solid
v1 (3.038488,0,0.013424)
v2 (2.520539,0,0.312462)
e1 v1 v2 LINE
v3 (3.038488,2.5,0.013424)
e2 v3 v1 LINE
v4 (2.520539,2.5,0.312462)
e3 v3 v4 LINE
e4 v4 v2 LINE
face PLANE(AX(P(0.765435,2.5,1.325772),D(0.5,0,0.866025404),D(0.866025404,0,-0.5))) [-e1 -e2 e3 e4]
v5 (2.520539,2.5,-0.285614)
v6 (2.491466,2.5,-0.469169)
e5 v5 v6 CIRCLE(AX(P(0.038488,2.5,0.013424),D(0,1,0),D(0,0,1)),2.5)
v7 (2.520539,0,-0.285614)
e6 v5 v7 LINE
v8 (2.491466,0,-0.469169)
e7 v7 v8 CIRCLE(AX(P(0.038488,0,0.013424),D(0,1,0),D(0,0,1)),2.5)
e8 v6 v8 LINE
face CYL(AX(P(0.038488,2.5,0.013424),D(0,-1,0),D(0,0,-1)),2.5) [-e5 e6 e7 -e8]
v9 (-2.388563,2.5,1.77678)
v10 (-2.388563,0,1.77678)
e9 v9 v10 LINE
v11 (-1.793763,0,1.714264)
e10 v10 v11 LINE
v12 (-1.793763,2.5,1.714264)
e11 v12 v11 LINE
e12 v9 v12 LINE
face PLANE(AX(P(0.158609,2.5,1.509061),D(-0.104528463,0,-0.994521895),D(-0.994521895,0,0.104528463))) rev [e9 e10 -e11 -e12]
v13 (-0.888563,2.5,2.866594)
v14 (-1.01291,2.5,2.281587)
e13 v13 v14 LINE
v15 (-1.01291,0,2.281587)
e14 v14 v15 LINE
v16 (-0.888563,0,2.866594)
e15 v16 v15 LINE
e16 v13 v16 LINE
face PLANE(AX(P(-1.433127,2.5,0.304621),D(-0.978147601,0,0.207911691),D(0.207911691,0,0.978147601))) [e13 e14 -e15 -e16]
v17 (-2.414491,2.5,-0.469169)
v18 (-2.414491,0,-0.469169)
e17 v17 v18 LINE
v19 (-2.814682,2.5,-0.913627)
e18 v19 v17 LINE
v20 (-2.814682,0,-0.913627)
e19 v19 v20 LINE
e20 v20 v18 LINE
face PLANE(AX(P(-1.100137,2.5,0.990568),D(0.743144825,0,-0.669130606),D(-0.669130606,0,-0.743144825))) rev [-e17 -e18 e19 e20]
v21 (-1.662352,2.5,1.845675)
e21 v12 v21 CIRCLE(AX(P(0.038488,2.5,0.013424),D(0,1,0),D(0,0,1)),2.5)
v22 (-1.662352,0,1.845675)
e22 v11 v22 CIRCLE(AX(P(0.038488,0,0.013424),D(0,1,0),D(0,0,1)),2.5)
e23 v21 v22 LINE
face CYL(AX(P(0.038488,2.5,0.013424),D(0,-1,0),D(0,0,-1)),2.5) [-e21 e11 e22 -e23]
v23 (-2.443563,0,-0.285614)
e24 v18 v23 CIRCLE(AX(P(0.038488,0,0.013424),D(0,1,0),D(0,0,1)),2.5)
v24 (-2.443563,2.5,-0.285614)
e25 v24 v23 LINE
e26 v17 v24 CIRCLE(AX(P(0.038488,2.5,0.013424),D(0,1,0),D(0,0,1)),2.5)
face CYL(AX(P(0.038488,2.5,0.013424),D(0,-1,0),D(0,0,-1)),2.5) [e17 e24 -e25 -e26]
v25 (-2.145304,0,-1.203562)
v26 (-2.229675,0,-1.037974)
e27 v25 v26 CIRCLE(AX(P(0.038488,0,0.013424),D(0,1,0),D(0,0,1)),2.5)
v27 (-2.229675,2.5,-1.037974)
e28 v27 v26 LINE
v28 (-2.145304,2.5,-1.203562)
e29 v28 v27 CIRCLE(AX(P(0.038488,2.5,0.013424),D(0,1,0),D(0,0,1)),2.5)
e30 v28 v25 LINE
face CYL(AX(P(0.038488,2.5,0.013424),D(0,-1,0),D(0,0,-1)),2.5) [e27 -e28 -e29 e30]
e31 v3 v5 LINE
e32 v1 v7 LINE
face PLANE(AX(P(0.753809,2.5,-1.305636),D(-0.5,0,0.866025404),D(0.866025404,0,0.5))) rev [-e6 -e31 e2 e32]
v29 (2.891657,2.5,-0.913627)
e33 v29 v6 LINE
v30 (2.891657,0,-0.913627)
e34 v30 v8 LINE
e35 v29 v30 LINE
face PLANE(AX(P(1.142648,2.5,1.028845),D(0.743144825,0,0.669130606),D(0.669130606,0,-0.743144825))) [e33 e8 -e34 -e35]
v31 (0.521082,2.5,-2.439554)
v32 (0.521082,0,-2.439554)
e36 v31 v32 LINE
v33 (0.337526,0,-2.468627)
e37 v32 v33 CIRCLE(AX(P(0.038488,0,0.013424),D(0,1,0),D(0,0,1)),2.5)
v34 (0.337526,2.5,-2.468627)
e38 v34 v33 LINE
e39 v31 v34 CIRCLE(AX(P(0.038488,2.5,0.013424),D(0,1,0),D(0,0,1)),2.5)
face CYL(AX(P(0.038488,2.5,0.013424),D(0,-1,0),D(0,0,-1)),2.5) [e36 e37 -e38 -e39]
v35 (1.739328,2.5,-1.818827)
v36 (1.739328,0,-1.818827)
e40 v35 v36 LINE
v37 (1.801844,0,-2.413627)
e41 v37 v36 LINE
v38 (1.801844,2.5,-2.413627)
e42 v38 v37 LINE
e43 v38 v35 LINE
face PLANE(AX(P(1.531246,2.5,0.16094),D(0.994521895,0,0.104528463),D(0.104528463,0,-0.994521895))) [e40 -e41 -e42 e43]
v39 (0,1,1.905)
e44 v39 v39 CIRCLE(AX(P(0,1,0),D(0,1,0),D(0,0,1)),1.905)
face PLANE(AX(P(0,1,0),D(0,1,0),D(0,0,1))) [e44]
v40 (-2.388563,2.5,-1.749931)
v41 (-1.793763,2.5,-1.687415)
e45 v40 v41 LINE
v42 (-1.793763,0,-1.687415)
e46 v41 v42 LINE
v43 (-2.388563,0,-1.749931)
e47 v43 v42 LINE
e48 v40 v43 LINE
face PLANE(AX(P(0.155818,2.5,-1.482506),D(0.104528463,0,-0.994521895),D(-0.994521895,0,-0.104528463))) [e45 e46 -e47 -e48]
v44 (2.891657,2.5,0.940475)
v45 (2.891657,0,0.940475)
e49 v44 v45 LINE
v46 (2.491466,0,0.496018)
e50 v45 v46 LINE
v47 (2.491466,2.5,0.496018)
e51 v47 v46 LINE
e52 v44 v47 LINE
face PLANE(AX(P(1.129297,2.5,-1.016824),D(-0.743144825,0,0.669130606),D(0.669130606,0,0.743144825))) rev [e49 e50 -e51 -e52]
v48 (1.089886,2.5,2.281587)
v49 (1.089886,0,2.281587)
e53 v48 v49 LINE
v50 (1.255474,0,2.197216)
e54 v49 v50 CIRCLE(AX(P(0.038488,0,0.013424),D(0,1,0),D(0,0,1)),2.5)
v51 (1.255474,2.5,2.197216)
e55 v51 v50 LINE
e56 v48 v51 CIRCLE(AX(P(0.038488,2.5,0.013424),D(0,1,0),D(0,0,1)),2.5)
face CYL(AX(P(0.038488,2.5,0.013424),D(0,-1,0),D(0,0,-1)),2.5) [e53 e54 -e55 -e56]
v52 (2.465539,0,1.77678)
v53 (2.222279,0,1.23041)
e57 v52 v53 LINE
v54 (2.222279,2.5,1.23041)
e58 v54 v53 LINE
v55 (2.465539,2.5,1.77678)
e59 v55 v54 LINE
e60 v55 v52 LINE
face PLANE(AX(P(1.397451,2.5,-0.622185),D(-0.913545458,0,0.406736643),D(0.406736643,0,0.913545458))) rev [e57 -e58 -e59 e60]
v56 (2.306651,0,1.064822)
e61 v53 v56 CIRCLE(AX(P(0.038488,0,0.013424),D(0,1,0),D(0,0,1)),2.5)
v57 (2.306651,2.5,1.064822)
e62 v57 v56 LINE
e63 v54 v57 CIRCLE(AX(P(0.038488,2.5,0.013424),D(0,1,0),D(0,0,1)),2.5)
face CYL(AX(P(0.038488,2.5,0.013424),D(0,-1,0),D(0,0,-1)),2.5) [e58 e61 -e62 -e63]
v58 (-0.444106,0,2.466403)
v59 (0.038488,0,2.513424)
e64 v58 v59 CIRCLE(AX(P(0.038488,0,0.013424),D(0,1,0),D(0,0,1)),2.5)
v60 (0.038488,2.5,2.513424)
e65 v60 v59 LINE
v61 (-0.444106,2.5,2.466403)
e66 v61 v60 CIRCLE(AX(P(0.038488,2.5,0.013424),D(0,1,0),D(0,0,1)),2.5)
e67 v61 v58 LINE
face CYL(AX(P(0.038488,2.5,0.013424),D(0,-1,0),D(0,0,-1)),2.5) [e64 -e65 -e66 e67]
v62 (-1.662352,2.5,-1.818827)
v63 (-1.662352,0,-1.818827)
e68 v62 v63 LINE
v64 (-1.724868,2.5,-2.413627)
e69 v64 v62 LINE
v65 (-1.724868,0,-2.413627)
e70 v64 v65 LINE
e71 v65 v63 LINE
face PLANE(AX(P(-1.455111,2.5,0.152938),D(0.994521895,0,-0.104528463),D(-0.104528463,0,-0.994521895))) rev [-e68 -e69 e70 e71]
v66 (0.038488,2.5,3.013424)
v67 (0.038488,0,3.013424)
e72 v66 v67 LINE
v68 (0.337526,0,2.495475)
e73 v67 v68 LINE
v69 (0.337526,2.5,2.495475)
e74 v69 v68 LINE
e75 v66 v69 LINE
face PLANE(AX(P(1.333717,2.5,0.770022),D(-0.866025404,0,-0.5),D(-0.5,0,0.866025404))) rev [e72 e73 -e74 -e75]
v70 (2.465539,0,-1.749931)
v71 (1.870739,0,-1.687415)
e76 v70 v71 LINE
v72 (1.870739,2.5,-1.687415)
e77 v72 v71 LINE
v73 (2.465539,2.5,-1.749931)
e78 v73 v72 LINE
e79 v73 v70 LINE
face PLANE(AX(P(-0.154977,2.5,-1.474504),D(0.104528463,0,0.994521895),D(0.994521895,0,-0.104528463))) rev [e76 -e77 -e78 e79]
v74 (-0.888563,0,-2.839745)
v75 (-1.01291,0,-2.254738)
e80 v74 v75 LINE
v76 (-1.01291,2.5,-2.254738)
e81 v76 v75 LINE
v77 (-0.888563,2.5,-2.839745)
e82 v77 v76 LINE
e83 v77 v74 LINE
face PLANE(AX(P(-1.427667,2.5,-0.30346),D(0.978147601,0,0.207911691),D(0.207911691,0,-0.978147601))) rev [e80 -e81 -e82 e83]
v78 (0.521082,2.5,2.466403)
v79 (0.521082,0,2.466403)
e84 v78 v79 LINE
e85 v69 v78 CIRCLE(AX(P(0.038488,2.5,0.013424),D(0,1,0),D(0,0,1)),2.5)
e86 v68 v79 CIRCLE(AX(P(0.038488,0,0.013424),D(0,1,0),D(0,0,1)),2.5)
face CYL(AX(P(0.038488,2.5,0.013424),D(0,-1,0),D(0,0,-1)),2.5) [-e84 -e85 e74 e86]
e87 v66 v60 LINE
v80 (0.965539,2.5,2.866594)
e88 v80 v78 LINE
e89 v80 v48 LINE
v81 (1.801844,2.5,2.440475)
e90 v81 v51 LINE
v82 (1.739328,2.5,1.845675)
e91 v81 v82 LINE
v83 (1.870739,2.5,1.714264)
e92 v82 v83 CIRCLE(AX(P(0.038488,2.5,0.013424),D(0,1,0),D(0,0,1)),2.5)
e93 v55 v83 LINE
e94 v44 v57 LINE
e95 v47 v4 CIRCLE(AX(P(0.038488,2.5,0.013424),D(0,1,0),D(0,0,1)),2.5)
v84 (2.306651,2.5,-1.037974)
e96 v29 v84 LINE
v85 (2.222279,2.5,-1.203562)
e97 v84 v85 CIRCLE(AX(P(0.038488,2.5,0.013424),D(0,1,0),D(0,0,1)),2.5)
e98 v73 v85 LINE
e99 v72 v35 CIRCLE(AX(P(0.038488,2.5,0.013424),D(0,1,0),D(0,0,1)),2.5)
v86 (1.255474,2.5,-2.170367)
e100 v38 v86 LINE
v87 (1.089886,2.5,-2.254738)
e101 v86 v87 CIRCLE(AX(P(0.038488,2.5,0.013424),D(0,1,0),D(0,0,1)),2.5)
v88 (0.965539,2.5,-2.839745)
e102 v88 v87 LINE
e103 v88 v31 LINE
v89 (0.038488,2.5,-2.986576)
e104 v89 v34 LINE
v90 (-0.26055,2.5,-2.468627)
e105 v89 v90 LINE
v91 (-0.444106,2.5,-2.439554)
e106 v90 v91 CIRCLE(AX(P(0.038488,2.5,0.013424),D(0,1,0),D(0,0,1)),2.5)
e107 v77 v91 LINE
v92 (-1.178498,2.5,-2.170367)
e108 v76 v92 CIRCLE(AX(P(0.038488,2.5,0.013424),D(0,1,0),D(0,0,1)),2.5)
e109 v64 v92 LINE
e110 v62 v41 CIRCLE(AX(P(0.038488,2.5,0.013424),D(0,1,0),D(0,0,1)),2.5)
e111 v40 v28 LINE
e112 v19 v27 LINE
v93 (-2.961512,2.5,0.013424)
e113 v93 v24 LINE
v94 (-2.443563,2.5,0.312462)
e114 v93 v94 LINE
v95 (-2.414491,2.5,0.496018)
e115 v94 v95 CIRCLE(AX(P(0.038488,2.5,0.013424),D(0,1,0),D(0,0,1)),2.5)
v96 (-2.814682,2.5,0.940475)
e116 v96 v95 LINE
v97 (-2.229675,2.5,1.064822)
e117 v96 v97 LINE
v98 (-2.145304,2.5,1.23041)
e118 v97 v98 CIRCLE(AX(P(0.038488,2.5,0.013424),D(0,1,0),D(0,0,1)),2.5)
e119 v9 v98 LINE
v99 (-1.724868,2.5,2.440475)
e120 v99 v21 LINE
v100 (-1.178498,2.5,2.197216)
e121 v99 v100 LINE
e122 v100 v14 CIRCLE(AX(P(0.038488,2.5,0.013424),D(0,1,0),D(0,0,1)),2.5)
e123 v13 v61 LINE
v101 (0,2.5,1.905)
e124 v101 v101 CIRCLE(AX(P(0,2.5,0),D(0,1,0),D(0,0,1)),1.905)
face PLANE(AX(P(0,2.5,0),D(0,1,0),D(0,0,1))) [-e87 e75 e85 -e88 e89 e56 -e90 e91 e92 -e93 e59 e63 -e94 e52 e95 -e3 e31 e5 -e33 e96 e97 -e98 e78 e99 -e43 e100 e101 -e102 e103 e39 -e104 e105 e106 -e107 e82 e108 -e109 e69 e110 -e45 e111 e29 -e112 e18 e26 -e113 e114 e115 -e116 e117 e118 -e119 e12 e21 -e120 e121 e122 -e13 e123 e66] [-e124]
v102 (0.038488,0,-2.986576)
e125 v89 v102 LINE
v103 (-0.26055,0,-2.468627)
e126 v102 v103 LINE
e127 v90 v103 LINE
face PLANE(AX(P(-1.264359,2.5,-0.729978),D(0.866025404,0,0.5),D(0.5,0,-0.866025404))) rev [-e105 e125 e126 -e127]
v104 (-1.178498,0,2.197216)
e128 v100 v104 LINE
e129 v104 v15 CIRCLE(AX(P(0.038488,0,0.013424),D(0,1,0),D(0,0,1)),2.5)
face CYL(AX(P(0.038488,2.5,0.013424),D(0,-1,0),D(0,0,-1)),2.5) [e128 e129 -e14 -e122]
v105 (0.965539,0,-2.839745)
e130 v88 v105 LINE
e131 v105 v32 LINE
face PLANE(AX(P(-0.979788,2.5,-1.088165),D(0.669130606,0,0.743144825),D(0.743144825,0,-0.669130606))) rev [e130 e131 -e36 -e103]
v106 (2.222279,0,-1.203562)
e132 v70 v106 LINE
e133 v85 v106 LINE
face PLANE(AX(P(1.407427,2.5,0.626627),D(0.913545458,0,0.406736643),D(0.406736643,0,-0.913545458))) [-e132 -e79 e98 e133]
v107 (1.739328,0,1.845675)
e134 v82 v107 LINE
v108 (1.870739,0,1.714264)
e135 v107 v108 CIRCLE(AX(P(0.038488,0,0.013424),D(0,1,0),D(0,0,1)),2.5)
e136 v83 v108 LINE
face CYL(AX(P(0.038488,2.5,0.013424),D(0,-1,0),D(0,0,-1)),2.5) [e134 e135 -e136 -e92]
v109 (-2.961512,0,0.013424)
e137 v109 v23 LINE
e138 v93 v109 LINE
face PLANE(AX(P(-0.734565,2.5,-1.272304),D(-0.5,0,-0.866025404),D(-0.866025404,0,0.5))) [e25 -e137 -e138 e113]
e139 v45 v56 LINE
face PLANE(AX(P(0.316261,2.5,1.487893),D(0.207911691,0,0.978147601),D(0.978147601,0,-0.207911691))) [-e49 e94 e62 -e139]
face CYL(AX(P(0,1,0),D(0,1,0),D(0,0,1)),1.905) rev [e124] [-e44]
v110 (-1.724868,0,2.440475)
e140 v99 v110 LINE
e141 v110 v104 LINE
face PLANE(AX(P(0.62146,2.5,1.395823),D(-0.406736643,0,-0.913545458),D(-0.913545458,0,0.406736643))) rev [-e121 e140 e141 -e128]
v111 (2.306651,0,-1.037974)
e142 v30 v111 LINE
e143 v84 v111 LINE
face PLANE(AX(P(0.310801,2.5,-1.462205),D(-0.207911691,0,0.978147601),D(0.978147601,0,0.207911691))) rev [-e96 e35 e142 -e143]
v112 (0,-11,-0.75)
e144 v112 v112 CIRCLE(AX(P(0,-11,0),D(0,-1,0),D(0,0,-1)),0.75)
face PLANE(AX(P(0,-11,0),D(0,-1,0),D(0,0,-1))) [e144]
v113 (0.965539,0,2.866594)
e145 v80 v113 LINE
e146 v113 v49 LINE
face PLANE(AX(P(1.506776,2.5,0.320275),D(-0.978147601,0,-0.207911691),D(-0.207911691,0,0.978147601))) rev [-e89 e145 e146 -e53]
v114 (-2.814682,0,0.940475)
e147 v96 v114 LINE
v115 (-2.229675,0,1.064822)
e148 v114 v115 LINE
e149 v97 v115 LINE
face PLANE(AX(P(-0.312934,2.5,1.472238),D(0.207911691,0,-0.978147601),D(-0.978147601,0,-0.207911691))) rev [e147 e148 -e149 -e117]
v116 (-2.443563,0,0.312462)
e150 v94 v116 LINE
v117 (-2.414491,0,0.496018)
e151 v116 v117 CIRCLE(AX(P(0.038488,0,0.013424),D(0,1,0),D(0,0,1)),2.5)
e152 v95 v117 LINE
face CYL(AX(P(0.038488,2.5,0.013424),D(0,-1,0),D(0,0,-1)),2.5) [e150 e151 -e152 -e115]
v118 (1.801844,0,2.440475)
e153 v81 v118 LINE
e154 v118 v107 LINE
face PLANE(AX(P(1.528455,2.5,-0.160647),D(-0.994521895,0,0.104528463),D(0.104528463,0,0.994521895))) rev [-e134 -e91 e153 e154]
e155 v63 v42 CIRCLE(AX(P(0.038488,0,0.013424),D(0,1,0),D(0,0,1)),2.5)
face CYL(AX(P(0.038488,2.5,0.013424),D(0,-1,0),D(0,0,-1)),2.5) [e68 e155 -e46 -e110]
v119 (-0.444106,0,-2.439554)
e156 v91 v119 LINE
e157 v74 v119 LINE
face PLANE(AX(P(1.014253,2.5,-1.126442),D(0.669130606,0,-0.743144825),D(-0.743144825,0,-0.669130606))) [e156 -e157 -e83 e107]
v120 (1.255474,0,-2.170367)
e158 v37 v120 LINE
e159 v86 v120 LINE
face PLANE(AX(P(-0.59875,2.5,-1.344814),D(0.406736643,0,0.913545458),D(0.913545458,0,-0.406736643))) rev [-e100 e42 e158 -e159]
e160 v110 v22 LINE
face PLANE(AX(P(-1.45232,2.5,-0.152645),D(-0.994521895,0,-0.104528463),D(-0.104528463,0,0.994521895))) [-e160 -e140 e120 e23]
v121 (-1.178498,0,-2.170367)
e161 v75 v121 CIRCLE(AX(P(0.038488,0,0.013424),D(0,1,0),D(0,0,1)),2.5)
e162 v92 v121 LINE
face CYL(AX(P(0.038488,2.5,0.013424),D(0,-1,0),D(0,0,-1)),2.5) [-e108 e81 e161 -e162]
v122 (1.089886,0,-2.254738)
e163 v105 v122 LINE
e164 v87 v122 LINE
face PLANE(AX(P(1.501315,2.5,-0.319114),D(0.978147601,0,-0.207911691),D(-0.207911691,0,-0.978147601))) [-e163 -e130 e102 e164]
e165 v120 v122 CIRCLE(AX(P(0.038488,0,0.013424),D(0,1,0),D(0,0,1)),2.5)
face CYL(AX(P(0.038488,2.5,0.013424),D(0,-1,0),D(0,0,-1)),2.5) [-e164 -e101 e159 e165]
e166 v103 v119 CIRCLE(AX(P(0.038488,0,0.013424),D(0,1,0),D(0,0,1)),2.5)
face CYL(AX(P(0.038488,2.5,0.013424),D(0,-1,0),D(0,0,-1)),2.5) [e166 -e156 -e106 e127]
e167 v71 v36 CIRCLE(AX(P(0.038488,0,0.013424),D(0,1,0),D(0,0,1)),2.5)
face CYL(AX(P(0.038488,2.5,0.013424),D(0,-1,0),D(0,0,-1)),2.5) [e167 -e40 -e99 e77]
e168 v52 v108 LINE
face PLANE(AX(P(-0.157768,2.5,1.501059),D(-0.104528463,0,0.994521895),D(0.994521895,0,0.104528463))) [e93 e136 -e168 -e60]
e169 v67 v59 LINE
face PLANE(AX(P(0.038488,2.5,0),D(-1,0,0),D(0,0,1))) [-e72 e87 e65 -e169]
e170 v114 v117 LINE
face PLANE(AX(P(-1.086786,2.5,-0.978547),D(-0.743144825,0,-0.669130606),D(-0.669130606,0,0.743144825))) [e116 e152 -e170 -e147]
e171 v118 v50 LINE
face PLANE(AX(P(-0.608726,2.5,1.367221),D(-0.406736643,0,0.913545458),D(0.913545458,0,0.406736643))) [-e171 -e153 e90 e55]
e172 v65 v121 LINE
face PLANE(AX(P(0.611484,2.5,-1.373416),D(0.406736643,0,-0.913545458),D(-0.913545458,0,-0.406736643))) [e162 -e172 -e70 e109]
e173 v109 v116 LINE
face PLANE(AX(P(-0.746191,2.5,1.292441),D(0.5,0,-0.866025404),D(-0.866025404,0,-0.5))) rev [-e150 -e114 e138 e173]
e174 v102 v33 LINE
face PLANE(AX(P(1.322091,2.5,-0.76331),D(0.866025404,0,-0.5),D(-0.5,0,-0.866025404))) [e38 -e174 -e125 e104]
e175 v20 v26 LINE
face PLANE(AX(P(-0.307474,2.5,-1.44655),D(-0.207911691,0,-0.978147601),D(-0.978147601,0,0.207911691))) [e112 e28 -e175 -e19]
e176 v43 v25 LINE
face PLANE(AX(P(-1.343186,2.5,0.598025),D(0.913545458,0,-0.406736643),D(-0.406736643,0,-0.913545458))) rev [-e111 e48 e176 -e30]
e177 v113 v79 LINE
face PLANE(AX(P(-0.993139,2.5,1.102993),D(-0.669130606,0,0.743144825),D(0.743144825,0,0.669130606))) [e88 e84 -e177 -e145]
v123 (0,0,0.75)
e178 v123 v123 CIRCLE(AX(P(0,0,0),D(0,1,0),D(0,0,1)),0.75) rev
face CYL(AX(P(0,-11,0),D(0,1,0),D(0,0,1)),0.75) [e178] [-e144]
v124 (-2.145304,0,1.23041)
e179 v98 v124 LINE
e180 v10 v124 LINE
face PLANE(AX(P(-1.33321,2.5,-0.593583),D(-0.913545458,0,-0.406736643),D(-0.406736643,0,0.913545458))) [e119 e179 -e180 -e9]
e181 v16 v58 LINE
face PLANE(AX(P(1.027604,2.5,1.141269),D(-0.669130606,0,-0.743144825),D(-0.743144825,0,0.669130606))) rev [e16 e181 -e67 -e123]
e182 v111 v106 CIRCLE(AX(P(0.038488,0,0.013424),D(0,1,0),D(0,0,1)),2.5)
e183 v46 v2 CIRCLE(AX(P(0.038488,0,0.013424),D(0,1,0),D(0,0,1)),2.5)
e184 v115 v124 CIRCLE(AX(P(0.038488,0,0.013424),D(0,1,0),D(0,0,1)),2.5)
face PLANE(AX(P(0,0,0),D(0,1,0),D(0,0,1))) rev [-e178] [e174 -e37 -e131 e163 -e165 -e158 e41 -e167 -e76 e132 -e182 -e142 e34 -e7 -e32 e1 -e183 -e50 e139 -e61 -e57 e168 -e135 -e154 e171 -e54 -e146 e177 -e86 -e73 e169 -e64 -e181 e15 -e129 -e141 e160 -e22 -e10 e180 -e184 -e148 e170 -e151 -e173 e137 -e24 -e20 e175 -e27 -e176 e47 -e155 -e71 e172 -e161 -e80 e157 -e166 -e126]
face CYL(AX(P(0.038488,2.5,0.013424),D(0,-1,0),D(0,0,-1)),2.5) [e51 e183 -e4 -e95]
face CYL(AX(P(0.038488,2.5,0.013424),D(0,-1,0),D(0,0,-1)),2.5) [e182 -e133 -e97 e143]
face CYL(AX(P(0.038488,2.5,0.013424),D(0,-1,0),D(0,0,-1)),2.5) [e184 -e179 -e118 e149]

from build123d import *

# Parameters (mm, degrees)
BOSS_EXTRUDE2_DEPTH = 2.5
SKETCH5_R           = 1.905
CUT_EXTRUDE1_DEPTH  = 1.5
SKETCH6_R           = 0.75
BOSS_EXTRUDE3_DEPTH = 11


# Read off the part's stored shape, not the designer's step: Boss-Extrude2
with BuildPart() as part:
    # Boss-Extrude2 outline → Boss-Extrude2 (new body)
    with BuildSketch(Plane(origin=(0, 0, 0), x_dir=(1, 0, 0), z_dir=(0, 1, 0))):
        with BuildLine():
            ThreePointArc((-0.444105945, -2.466402753), (-0.203951755, -2.501641146), (0.038487797, -2.513424302))
            Line((0.038487797, -2.513424302), (0.038487797, -3.013424302))
            Line((0.038487797, -3.013424302), (0.337525902, -2.495475109))
            ThreePointArc((0.337525902, -2.495475109), (0.429573959, -2.482645153), (0.521081538, -2.466402753))
            Line((0.521081538, -2.466402753), (0.96553878, -2.866593851))
            Line((0.96553878, -2.866593851), (1.089885816, -2.28158704))
            ThreePointArc((1.089885816, -2.28158704), (1.173464046, -2.240940612), (1.255473747, -2.197215774))
            Line((1.255473747, -2.197215774), (1.801843553, -2.440475285))
            Line((1.801843553, -2.440475285), (1.739327566, -1.845675398))
            ThreePointArc((1.739327566, -1.845675398), (1.80625475, -1.781191255), (1.870738892, -1.714264071))
            Line((1.870738892, -1.714264071), (2.46553878, -1.776780059))
            Line((2.46553878, -1.776780059), (2.222279269, -1.230410253))
            ThreePointArc((2.222279269, -1.230410253), (2.266004107, -1.148400551), (2.306650534, -1.064822321))
            Line((2.306650534, -1.064822321), (2.891657345, -0.940475285))
            Line((2.891657345, -0.940475285), (2.491466248, -0.496018043))
            ThreePointArc((2.491466248, -0.496018043), (2.507708648, -0.404510464), (2.520538604, -0.312462408))
            Line((2.520538604, -0.312462408), (3.038487797, -0.013424302))
            Line((3.038487797, -0.013424302), (2.520538604, 0.285613804))
            ThreePointArc((2.520538604, 0.285613804), (2.507708648, 0.377661861), (2.491466248, 0.46916944))
            Line((2.491466248, 0.46916944), (2.891657345, 0.913626681))
            Line((2.891657345, 0.913626681), (2.306650534, 1.037973718))
            ThreePointArc((2.306650534, 1.037973718), (2.266004107, 1.121551948), (2.222279269, 1.203561649))
            Line((2.222279269, 1.203561649), (2.46553878, 1.749931455))
            Line((2.46553878, 1.749931455), (1.870738892, 1.687415468))
            ThreePointArc((1.870738892, 1.687415468), (1.80625475, 1.754342652), (1.739327566, 1.818826794))
            Line((1.739327566, 1.818826794), (1.801843553, 2.413626681))
            Line((1.801843553, 2.413626681), (1.255473747, 2.170367171))
            ThreePointArc((1.255473747, 2.170367171), (1.173464046, 2.214092009), (1.089885816, 2.254738436))
            Line((1.089885816, 2.254738436), (0.96553878, 2.839745247))
            Line((0.96553878, 2.839745247), (0.521081538, 2.439554149))
            ThreePointArc((0.521081538, 2.439554149), (0.429573959, 2.45579655), (0.337525902, 2.468626506))
            Line((0.337525902, 2.468626506), (0.038487797, 2.986575698))
            Line((0.038487797, 2.986575698), (-0.260550309, 2.468626506))
            ThreePointArc((-0.260550309, 2.468626506), (-0.352598366, 2.45579655), (-0.444105945, 2.439554149))
            Line((-0.444105945, 2.439554149), (-0.888563187, 2.839745247))
            Line((-0.888563187, 2.839745247), (-1.012910223, 2.254738436))
            ThreePointArc((-1.012910223, 2.254738436), (-1.096488453, 2.214092009), (-1.178498154, 2.170367171))
            Line((-1.178498154, 2.170367171), (-1.72486796, 2.413626681))
            Line((-1.72486796, 2.413626681), (-1.662351973, 1.818826794))
            ThreePointArc((-1.662351973, 1.818826794), (-1.729279156, 1.754342651), (-1.793763299, 1.687415468))
            Line((-1.793763299, 1.687415468), (-2.388563187, 1.749931455))
            Line((-2.388563187, 1.749931455), (-2.145303676, 1.203561649))
            ThreePointArc((-2.145303676, 1.203561649), (-2.189028514, 1.121551948), (-2.229674941, 1.037973718))
            Line((-2.229674941, 1.037973718), (-2.814681752, 0.913626681))
            Line((-2.814681752, 0.913626681), (-2.414490654, 0.46916944))
            ThreePointArc((-2.414490654, 0.46916944), (-2.430733055, 0.377661861), (-2.443563011, 0.285613804))
            Line((-2.443563011, 0.285613804), (-2.961512203, -0.013424302))
            Line((-2.961512203, -0.013424302), (-2.443563011, -0.312462408))
            ThreePointArc((-2.443563011, -0.312462408), (-2.430733055, -0.404510465), (-2.414490654, -0.496018043))
            Line((-2.414490654, -0.496018043), (-2.814681752, -0.940475285))
            Line((-2.814681752, -0.940475285), (-2.229674941, -1.064822321))
            ThreePointArc((-2.229674941, -1.064822321), (-2.189028514, -1.148400551), (-2.145303676, -1.230410253))
            Line((-2.145303676, -1.230410253), (-2.388563187, -1.776780059))
            Line((-2.388563187, -1.776780059), (-1.793763299, -1.714264071))
            ThreePointArc((-1.793763299, -1.714264071), (-1.729279156, -1.781191255), (-1.662351973, -1.845675398))
            Line((-1.662351973, -1.845675398), (-1.72486796, -2.440475285))
            Line((-1.72486796, -2.440475285), (-1.178498154, -2.197215774))
            ThreePointArc((-1.178498154, -2.197215774), (-1.096488453, -2.240940612), (-1.012910223, -2.28158704))
            Line((-1.012910223, -2.28158704), (-0.888563187, -2.866593851))
            Line((-0.888563187, -2.866593851), (-0.444105945, -2.466402753))
        make_face()
    extrude(amount=BOSS_EXTRUDE2_DEPTH)

    # Sketch5 → Cut-Extrude1 (cut)
    with BuildSketch(Plane(origin=(0, 2.5, 0), x_dir=(1, 0, 0), z_dir=(0, 1, 0))):
        with Locations(Location((0, 0, 0), (0, 0, 270))):
            Circle(SKETCH5_R)
    extrude(amount=-CUT_EXTRUDE1_DEPTH, mode=Mode.SUBTRACT)

    # Sketch6 → Boss-Extrude3 (add)
    with BuildSketch(Plane.XZ):
        with Locations(Location((0, 0, 0), (0, 0, 90))):
            Circle(SKETCH6_R)
    extrude(amount=BOSS_EXTRUDE3_DEPTH)


solid = part.part
